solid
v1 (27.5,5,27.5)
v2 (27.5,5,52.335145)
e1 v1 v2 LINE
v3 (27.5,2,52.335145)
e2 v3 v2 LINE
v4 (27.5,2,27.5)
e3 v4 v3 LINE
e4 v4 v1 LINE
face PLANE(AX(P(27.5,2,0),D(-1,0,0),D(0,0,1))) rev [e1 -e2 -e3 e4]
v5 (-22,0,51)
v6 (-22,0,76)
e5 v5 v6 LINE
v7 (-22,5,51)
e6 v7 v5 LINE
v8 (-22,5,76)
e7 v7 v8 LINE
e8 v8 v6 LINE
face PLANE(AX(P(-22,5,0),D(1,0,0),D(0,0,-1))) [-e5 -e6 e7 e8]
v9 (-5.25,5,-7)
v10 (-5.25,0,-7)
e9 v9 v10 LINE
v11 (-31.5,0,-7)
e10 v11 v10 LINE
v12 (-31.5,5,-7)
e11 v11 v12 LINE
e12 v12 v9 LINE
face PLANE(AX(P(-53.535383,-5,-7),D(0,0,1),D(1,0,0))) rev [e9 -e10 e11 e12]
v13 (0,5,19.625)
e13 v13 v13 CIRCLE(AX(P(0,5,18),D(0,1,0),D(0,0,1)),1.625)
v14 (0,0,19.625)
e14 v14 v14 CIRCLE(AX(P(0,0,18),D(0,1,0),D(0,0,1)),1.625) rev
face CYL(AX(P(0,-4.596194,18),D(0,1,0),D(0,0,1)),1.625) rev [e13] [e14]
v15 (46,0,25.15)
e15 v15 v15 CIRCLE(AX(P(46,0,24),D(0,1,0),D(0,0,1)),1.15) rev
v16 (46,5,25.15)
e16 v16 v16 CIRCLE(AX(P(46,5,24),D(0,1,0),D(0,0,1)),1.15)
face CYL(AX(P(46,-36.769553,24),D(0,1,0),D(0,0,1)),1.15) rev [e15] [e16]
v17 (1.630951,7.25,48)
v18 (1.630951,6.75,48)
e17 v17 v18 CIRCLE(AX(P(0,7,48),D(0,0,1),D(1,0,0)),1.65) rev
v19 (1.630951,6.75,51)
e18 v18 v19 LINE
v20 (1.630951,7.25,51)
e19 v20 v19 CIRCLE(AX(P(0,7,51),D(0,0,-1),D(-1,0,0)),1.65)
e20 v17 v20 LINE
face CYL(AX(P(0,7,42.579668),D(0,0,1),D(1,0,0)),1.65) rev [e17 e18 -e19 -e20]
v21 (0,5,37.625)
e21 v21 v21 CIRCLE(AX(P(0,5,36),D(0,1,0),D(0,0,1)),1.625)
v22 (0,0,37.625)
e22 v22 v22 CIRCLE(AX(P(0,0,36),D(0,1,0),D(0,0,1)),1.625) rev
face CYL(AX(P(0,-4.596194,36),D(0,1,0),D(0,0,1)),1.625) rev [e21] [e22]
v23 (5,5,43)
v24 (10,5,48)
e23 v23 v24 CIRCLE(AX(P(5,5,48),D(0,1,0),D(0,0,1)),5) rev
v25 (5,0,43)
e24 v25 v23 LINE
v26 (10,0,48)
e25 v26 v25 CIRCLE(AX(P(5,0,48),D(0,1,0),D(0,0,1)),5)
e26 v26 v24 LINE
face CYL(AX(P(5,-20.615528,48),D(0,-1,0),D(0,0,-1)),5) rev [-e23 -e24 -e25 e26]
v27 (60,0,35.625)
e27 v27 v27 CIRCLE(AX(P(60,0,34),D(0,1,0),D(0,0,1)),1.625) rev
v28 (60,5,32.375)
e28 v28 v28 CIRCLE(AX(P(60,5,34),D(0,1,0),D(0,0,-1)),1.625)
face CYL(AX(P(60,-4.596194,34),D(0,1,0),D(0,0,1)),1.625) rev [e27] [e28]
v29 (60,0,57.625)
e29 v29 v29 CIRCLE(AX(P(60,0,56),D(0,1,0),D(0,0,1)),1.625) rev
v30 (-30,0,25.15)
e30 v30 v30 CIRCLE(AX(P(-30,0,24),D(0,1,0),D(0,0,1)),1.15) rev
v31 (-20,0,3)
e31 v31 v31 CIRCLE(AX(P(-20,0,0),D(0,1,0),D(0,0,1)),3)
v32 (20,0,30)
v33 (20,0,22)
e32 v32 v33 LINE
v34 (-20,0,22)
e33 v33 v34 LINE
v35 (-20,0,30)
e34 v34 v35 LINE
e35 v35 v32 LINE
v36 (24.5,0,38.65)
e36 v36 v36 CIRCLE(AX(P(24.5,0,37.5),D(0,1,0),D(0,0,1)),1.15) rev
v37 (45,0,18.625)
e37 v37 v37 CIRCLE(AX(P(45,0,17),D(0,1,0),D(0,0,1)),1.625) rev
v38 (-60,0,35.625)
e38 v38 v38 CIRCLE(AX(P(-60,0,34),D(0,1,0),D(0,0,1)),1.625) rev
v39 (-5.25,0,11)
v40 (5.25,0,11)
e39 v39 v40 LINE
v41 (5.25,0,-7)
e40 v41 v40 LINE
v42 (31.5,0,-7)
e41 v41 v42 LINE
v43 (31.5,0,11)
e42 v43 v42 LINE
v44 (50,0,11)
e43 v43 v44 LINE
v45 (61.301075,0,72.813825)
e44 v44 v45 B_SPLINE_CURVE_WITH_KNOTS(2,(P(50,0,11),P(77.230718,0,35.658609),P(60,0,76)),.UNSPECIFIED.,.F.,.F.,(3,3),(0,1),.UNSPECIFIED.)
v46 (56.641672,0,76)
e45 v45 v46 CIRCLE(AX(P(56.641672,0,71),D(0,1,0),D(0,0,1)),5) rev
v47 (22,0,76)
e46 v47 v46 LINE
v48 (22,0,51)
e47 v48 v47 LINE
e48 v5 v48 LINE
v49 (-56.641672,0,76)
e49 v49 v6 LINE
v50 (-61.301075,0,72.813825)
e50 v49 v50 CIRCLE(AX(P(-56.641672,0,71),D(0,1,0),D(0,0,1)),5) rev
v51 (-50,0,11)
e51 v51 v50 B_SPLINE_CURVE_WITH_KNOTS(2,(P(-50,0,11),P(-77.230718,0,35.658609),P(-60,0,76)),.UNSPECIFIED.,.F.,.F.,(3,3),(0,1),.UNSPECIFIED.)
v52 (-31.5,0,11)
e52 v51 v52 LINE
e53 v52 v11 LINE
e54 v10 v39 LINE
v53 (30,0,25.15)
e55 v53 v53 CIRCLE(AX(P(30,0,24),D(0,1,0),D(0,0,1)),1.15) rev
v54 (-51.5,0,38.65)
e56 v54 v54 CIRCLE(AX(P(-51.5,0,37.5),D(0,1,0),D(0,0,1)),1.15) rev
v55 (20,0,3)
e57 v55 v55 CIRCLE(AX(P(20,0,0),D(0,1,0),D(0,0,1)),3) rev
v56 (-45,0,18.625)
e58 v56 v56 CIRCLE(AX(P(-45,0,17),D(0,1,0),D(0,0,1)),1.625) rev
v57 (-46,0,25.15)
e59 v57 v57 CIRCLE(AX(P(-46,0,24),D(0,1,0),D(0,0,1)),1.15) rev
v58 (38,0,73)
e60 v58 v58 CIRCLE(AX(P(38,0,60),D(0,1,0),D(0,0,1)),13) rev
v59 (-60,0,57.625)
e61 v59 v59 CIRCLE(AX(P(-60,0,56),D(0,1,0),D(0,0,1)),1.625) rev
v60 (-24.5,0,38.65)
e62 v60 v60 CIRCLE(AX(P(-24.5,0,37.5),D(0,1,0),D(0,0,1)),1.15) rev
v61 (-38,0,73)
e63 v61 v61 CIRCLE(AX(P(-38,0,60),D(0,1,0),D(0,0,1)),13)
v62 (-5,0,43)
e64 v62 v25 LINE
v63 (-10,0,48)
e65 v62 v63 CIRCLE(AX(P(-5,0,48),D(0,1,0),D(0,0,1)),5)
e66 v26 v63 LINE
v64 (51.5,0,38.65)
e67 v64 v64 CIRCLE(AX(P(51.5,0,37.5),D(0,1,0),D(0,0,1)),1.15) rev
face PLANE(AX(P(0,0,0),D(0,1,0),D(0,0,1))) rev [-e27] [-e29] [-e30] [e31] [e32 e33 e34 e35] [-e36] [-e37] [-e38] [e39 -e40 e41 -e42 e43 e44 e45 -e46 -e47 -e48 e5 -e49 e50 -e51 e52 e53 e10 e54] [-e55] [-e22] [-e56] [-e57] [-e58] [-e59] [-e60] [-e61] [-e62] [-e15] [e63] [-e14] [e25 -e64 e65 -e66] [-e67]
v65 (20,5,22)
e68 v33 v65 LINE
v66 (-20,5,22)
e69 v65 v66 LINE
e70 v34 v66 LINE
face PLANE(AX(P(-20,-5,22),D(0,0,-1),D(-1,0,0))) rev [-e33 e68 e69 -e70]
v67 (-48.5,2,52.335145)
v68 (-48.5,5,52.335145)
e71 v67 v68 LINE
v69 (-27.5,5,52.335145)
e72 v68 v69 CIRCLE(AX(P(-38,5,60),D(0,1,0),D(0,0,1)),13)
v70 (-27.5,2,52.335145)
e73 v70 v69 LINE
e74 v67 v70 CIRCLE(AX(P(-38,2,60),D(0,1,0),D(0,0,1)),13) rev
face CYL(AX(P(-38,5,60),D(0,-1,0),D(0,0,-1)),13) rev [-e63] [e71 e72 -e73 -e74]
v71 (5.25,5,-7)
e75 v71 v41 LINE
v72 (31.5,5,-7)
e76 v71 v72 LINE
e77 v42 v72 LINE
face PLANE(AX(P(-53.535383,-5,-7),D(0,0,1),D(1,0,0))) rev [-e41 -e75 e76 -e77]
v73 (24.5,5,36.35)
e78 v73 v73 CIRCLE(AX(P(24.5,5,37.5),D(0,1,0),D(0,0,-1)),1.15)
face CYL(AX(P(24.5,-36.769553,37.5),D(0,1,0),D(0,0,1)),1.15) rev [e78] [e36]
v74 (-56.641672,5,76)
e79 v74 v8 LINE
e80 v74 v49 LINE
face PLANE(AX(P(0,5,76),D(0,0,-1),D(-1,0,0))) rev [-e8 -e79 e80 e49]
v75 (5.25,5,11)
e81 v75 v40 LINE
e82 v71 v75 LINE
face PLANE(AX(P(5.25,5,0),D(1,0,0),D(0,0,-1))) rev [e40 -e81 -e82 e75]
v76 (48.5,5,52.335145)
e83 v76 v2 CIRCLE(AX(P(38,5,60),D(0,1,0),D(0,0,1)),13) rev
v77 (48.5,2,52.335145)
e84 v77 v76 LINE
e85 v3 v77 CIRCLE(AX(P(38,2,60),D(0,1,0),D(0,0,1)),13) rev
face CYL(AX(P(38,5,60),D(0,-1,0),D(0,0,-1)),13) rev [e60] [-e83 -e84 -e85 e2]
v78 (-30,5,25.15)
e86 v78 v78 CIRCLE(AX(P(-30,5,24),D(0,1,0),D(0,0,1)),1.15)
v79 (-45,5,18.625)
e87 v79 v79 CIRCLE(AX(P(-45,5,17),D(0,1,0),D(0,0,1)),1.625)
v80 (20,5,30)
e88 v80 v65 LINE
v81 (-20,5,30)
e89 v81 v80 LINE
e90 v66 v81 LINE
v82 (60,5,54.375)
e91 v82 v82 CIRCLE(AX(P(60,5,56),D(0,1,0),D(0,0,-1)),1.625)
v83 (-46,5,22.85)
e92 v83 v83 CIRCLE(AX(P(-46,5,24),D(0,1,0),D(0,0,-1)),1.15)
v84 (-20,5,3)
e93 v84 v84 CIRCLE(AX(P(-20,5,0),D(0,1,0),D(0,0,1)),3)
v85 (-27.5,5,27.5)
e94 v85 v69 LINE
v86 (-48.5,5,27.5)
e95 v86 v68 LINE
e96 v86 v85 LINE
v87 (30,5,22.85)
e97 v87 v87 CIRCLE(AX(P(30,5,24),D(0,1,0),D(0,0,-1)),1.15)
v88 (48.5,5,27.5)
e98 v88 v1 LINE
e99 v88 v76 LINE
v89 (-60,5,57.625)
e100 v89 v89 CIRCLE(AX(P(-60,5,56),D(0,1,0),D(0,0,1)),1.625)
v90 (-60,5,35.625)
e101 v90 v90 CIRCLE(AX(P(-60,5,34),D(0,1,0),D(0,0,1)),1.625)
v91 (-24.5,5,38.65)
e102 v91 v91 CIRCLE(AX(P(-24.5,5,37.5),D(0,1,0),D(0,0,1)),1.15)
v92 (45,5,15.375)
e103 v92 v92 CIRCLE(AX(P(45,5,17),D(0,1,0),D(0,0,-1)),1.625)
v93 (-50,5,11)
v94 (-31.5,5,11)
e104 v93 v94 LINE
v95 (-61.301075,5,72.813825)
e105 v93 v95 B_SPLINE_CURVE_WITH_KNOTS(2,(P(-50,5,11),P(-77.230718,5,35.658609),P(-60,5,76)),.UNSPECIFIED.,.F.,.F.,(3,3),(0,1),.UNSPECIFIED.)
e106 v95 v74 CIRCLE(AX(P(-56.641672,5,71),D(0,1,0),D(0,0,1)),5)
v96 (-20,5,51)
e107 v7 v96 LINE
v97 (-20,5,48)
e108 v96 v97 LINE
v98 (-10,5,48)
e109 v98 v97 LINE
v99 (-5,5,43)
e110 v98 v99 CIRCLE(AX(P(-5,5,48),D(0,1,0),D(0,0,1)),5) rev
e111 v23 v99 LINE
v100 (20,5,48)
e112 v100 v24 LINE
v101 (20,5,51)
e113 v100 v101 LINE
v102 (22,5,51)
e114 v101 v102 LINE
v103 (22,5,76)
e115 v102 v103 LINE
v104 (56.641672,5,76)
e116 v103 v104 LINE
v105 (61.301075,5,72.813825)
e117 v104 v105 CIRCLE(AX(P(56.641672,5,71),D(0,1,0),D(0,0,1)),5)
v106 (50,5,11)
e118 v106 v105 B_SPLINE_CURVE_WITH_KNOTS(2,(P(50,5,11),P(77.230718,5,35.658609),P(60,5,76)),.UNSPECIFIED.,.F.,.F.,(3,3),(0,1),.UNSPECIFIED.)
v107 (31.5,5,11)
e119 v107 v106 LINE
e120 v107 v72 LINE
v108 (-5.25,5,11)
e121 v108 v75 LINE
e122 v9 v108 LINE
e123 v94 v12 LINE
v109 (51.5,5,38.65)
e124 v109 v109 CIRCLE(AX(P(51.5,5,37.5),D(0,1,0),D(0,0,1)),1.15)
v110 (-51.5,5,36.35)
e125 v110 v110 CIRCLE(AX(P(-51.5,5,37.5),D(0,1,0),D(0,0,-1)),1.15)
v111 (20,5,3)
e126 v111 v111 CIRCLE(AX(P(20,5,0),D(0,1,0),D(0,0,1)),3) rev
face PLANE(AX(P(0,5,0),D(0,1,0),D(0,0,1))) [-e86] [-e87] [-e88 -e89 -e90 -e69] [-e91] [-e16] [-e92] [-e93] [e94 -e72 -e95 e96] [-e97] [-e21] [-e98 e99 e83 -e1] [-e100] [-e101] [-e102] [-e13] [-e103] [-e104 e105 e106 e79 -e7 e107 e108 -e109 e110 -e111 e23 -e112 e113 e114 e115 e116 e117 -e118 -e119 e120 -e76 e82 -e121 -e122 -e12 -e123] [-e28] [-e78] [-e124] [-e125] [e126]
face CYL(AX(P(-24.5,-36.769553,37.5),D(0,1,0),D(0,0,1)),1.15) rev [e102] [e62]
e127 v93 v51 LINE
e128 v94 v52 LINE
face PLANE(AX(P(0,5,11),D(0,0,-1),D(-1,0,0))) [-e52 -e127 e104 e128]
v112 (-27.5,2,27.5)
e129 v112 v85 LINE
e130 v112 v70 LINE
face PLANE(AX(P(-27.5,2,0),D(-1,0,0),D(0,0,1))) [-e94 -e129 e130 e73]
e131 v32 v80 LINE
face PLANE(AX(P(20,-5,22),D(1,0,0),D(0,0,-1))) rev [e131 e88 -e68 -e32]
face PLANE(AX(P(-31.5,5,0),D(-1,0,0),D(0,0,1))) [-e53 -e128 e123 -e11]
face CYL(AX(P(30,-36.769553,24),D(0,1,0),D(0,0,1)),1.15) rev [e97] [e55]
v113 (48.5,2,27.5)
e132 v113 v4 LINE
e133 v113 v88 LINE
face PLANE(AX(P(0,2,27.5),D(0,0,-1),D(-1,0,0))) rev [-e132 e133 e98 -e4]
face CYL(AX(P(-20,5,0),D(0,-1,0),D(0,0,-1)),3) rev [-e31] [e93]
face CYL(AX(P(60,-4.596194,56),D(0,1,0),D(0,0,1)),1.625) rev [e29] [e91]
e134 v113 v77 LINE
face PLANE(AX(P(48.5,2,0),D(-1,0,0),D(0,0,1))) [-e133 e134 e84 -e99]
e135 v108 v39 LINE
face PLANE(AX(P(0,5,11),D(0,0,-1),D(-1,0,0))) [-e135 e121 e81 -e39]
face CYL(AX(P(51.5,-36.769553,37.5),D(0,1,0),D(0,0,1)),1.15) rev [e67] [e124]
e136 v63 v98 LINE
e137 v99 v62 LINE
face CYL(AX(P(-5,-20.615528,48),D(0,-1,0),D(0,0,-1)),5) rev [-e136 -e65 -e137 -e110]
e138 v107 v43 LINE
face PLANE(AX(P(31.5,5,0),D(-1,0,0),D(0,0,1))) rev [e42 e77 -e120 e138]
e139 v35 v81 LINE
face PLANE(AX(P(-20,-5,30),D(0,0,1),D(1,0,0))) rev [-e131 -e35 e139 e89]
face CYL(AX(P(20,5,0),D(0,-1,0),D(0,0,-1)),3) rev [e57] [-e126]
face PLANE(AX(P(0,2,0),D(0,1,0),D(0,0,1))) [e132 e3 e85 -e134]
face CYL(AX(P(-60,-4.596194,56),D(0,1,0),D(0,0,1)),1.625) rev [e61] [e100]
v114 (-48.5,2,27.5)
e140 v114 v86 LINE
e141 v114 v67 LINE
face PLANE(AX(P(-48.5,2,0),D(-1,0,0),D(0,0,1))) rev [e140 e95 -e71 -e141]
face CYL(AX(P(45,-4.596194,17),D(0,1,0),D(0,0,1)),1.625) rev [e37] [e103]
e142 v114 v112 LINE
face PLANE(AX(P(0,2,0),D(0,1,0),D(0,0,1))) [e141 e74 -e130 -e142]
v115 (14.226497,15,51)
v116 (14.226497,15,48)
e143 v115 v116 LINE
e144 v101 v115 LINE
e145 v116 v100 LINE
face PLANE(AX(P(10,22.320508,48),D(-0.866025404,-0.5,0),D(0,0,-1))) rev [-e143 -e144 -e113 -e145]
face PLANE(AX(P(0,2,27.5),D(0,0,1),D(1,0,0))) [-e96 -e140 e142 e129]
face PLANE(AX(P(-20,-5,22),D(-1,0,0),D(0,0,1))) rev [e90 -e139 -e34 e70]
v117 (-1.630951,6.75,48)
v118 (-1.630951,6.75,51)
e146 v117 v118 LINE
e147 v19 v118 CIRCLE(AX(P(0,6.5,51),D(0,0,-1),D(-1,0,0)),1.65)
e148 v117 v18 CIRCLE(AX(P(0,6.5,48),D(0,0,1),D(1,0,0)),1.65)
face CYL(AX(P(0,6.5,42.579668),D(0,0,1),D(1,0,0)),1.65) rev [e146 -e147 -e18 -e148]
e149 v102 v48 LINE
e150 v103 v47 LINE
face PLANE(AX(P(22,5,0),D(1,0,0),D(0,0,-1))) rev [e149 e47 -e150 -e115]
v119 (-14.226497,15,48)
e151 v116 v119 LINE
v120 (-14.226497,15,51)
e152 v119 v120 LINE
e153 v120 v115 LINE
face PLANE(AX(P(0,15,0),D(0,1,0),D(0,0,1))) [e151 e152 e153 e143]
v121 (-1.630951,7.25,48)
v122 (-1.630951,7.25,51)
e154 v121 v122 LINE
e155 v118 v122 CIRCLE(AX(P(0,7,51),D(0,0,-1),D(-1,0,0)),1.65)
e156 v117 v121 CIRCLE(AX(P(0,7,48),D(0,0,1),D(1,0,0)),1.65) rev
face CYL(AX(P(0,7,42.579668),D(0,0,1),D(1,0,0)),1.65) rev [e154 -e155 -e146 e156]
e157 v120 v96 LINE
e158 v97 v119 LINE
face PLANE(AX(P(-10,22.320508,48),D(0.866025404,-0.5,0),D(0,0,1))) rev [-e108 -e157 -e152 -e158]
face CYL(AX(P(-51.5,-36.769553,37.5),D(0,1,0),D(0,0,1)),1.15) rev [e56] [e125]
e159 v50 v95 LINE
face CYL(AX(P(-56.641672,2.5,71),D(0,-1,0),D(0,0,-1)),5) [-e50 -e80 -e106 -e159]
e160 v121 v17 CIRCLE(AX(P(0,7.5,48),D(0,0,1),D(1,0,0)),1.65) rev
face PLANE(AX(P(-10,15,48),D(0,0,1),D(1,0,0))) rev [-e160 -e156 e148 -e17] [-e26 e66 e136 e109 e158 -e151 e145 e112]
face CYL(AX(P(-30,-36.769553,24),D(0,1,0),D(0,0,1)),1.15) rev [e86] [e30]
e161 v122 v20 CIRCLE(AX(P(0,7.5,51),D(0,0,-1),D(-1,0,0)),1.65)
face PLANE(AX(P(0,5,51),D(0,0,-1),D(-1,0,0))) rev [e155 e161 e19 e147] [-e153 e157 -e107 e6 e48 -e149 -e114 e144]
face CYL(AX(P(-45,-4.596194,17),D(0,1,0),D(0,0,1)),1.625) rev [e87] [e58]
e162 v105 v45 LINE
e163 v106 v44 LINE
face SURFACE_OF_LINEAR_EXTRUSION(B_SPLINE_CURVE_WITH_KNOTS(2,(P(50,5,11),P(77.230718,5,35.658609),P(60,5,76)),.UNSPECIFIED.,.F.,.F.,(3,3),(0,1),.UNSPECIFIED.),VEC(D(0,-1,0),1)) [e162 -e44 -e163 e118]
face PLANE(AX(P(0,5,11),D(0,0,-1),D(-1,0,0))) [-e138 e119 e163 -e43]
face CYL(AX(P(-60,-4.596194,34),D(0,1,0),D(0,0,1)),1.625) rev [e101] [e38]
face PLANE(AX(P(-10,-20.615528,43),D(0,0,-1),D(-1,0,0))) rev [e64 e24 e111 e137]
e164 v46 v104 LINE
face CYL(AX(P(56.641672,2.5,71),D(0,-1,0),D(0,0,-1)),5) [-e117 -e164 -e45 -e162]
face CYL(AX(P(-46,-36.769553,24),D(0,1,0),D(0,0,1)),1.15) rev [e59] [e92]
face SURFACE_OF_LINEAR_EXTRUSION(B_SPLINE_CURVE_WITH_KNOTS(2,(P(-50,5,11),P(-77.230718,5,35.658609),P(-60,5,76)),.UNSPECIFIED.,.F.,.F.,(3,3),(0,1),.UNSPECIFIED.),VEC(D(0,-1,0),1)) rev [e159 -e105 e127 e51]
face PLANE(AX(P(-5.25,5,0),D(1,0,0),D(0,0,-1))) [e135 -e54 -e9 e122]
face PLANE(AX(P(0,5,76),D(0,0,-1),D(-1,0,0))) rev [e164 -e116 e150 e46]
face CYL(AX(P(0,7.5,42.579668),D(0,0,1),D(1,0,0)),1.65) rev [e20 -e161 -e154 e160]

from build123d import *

# Parameters (mm, degrees)
SKETCH1_W           = 26.25
SKETCH1_H           = 22
SKETCH1_R           = 3
SKETCH1_R_2         = 13
BOSS_EXTRUDE1_DEPTH = 5
FILLET1_R           = 5
SKETCH2_R           = 1.625
CUT_EXTRUDE1_DEPTH  = 5
CUT_EXTRUDE2_START  = -5
SKETCH3_R           = 1.15
SKETCH3_R_2         = 13
CUT_EXTRUDE2_DEPTH  = 5
SKETCH5_W           = 20
SKETCH5_H           = 3
BOSS_EXTRUDE2_DEPTH = 10
SKETCH6_R           = 1.65
CUT_EXTRUDE4_DEPTH  = 28
CHAMFER1_SIZE       = 10
CHAMFER1_SIZE_2     = 17.320508076
SKETCH9_W           = 20
SKETCH9_H           = 5
CUT_EXTRUDE6_DEPTH  = 5
FILLET3_R           = 5
CUT_EXTRUDE9_START  = -3
CUT_EXTRUDE9_DEPTH  = 3
SKETCH16_W          = 40
SKETCH16_H          = 8
CUT_EXTRUDE11_DEPTH = 10
SKETCH17_W          = 88.86330123
SKETCH17_H          = 4
CUT_EXTRUDE12_DEPTH = 10


# Some blends are built 0.0001 mm under size
with BuildPart() as part:
    # Sketch1 → Boss-Extrude1 (new body)
    # profile 1 of 3: a face of its own
    with BuildSketch(Plane(origin=(0, 0, 0), x_dir=(1, 0, 0), z_dir=(0, 1, 0))):
        with Locations((18.375, 0)):
            Rectangle(SKETCH1_W, SKETCH1_H)
        with Locations(Location((20, 0, 0), (0, 0, 270))):
            Circle(SKETCH1_R, mode=Mode.SUBTRACT)
    # profile 2 of 3: a face of its own
    with BuildSketch(Plane(origin=(0, 0, 0), x_dir=(1, 0, 0), z_dir=(0, 1, 0))):
        with Locations((-18.375, 0)):
            Rectangle(SKETCH1_W, SKETCH1_H)
        with Locations(Location((-20, 0, 0), (0, 0, 270))):
            Circle(SKETCH1_R, mode=Mode.SUBTRACT)
    # profile 3 of 3: a face of its own
    with BuildSketch(Plane(origin=(0, 0, 0), x_dir=(1, 0, 0), z_dir=(0, 1, 0))):
        with BuildLine():
            Line((-5.25, -11), (-31.5, -11))
            Line((-31.5, -11), (-50, -11))
            add(Edge.make_bspline(
                [(-50, -11), (-77.2307176, -35.658609428), (-60, -76)],
                knots=[0, 0, 0, 1, 1, 1], degree=2))
            Line((-60, -76), (-22, -76))
            Line((-22, -76), (-22, -51))
            Line((-22, -51), (22, -51))
            Line((22, -51), (22, -76))
            Line((22, -76), (60, -76))
            add(Edge.make_bspline(
                [(50, -11), (77.2307176, -35.658609428), (60, -76)],
                knots=[0, 0, 0, 1, 1, 1], degree=2))
            Line((50, -11), (31.5, -11))
            Line((31.5, -11), (5.25, -11))
            Line((5.25, -11), (-5.25, -11))
        make_face()
        with Locations(Location((-38, -60, 0), (0, 0, 270))):
            Circle(SKETCH1_R_2, mode=Mode.SUBTRACT)
        with Locations(Location((38, -60, 0), (0, 0, 270))):
            Circle(SKETCH1_R_2, mode=Mode.SUBTRACT)
    extrude(amount=BOSS_EXTRUDE1_DEPTH)

    # Fillet1
    fillet1_edges = [part.edges().sort_by_distance(p)[0] for p in [
        (60, 2.5, 76),
        (-60, 2.5, 76),
    ]]
    fillet(fillet1_edges, radius=FILLET1_R)

    # Sketch2 → Cut-Extrude1 (cut)
    with BuildSketch(Plane(origin=(0, 5, 0), x_dir=(1, 0, 0), z_dir=(0, 1, 0))):
        with Locations(Location((-60, -56, 0), (0, 0, 270))):
            Circle(SKETCH2_R)
        with Locations(Location((60, -56, 0), (0, 0, 270))):
            Circle(SKETCH2_R)
        with Locations(Location((-45, -17, 0), (0, 0, 270))):
            Circle(SKETCH2_R)
        with Locations(Location((-60, -34, 0), (0, 0, 270))):
            Circle(SKETCH2_R)
        with Locations(Location((60, -34, 0), (0, 0, 270))):
            Circle(SKETCH2_R)
        with Locations(Location((45, -17, 0), (0, 0, 270))):
            Circle(SKETCH2_R)
        with Locations(Location((0, -18, 0), (0, 0, 270))):
            Circle(SKETCH2_R)
        with Locations(Location((0, -36, 0), (0, 0, 270))):
            Circle(SKETCH2_R)
    extrude(amount=-CUT_EXTRUDE1_DEPTH, mode=Mode.SUBTRACT)

    # Sketch3 → Cut-Extrude2 (cut)
    with BuildSketch(Plane(origin=(0, 5, 0), x_dir=(1, 0, 0), z_dir=(0, 1, 0)).offset(CUT_EXTRUDE2_START)):
        with Locations(Location((-30, -24, 0), (0, 0, 270))):
            Circle(SKETCH3_R)
        with Locations(Location((-38, -60, 0), (0, 0, 270))):
            Circle(SKETCH3_R_2)
        with Locations(Location((-24.5, -37.5, 0), (0, 0, 270))):
            Circle(SKETCH3_R)
        with Locations(Location((-46, -24, 0), (0, 0, 270))):
            Circle(SKETCH3_R)
        with Locations(Location((-51.5, -37.5, 0), (0, 0, 270))):
            Circle(SKETCH3_R)
        with Locations(Location((24.5, -37.5, 0), (0, 0, 270))):
            Circle(SKETCH3_R)
        with Locations(Location((30, -24, 0), (0, 0, 270))):
            Circle(SKETCH3_R)
        with Locations(Location((46, -24, 0), (0, 0, 270))):
            Circle(SKETCH3_R)
        with Locations(Location((51.5, -37.5, 0), (0, 0, 270))):
            Circle(SKETCH3_R)
    extrude(amount=CUT_EXTRUDE2_DEPTH, mode=Mode.SUBTRACT)

    # Sketch5 → Boss-Extrude2 (add)
    with BuildSketch(Plane(origin=(0, 5, 0), x_dir=(1, 0, 0), z_dir=(0, 1, 0))):
        with Locations((0, -49.5)):
            Rectangle(SKETCH5_W, SKETCH5_H)
    extrude(amount=BOSS_EXTRUDE2_DEPTH)

    # Sketch6 → Cut-Extrude4 (cut)
    with BuildSketch(Plane.XY.offset(76)):
        with Locations((0, 7)):
            Circle(SKETCH6_R)
        with Locations((0, 7.5)):
            Circle(SKETCH6_R)
        with Locations((0, 6.5)):
            Circle(SKETCH6_R)
    extrude(amount=-CUT_EXTRUDE4_DEPTH, mode=Mode.SUBTRACT)

    # Chamfer1
    # the kernel refuses this chamfer: 17.320508076, 10 mm, written as the material it adds along each edge
    with BuildSketch(Plane(origin=(-10, 5, 51), x_dir=(-0.9983227437537926, -0.05789386240267139, 0), z_dir=(0, 0, -1))) as chamfer1_piece_1_section:
        Polygon((CHAMFER1_SIZE * 0.998322743754, CHAMFER1_SIZE * 0.0578938624027), (-CHAMFER1_SIZE_2 * 0.0578938624016, CHAMFER1_SIZE_2 * 0.998322743736), (0, 0), align=None)
    chamfer1_piece_1 = extrude(amount=3, mode=Mode.PRIVATE)
    chamfer1_piece_1 = split(chamfer1_piece_1, bisect_by=Plane(origin=(-13.731694811, 15, 49.5), z_dir=(0, -1, 0)), keep=Keep.TOP, mode=Mode.PRIVATE)
    add(chamfer1_piece_1)
    with BuildSketch(Plane(origin=(10, 5, 48), x_dir=(0.9983227437537926, -0.05789386240267139, 0), z_dir=(0, 0, 1))) as chamfer1_piece_2_section:
        Polygon((CHAMFER1_SIZE * 0.998322743754, CHAMFER1_SIZE * 0.0578938624027), (-CHAMFER1_SIZE_2 * 0.0578938624016, CHAMFER1_SIZE_2 * 0.998322743736), (0, 0), align=None)
    chamfer1_piece_2 = extrude(amount=3, mode=Mode.PRIVATE)
    chamfer1_piece_2 = split(chamfer1_piece_2, bisect_by=Plane(origin=(13.731694811, 15, 49.5), z_dir=(0, -1, 0)), keep=Keep.TOP, mode=Mode.PRIVATE)
    add(chamfer1_piece_2)

    # Sketch9 → Cut-Extrude6 (cut)
    with BuildSketch(Plane(origin=(0, 5, 0), x_dir=(1, 0, 0), z_dir=(0, 1, 0))):
        with Locations((0, -45.5)):
            Rectangle(SKETCH9_W, SKETCH9_H)
    extrude(amount=-CUT_EXTRUDE6_DEPTH, mode=Mode.SUBTRACT)

    # Fillet3
    fillet3_edges = [part.edges().sort_by_distance(p)[0] for p in [
        (-10, 2.5, 43),
        (10, 2.5, 43),
    ]]
    fillet(fillet3_edges, radius=FILLET3_R - 0.0001)  # a hair under: the kernel refuses the full size

    # Sketch8 → Cut-Extrude9 (cut)
    with BuildSketch(Plane(origin=(0, 5, 0), x_dir=(1, 0, 0), z_dir=(0, 1, 0)).offset(CUT_EXTRUDE9_START)):
        with BuildLine():
            Line((-27.5, -27.5), (-48.5, -27.5))
            Line((-48.5, -27.5), (-48.5, -52.335145142))
            ThreePointArc((-48.5, -52.335145142), (-38, -47), (-27.5, -52.335145142))
            Line((-27.5, -52.335145142), (-27.5, -27.5))
        make_face()
        with BuildLine():
            ThreePointArc((27.5, -52.335145142), (38, -47), (48.5, -52.335145142))
            Line((48.5, -52.335145142), (48.5, -27.5))
            Line((48.5, -27.5), (27.5, -27.5))
            Line((27.5, -27.5), (27.5, -52.335145142))
        make_face()
    extrude(amount=CUT_EXTRUDE9_DEPTH, mode=Mode.SUBTRACT)

    # Sketch16 → Cut-Extrude11 (cut)
    with BuildSketch(Plane(origin=(0, 5, 0), x_dir=(1, 0, 0), z_dir=(0, 1, 0))):
        with Locations((0, -26)):
            Rectangle(SKETCH16_W, SKETCH16_H)
    extrude(amount=-CUT_EXTRUDE11_DEPTH, mode=Mode.SUBTRACT)

    # Sketch17 → Cut-Extrude12 (cut)
    with BuildSketch(Plane(origin=(0, 5, 0), x_dir=(1, 0, 0), z_dir=(0, 1, 0))):
        with Locations((-9.103732695, 9)):
            Rectangle(SKETCH17_W, SKETCH17_H)
    extrude(amount=-CUT_EXTRUDE12_DEPTH, mode=Mode.SUBTRACT)


solid = part.part
